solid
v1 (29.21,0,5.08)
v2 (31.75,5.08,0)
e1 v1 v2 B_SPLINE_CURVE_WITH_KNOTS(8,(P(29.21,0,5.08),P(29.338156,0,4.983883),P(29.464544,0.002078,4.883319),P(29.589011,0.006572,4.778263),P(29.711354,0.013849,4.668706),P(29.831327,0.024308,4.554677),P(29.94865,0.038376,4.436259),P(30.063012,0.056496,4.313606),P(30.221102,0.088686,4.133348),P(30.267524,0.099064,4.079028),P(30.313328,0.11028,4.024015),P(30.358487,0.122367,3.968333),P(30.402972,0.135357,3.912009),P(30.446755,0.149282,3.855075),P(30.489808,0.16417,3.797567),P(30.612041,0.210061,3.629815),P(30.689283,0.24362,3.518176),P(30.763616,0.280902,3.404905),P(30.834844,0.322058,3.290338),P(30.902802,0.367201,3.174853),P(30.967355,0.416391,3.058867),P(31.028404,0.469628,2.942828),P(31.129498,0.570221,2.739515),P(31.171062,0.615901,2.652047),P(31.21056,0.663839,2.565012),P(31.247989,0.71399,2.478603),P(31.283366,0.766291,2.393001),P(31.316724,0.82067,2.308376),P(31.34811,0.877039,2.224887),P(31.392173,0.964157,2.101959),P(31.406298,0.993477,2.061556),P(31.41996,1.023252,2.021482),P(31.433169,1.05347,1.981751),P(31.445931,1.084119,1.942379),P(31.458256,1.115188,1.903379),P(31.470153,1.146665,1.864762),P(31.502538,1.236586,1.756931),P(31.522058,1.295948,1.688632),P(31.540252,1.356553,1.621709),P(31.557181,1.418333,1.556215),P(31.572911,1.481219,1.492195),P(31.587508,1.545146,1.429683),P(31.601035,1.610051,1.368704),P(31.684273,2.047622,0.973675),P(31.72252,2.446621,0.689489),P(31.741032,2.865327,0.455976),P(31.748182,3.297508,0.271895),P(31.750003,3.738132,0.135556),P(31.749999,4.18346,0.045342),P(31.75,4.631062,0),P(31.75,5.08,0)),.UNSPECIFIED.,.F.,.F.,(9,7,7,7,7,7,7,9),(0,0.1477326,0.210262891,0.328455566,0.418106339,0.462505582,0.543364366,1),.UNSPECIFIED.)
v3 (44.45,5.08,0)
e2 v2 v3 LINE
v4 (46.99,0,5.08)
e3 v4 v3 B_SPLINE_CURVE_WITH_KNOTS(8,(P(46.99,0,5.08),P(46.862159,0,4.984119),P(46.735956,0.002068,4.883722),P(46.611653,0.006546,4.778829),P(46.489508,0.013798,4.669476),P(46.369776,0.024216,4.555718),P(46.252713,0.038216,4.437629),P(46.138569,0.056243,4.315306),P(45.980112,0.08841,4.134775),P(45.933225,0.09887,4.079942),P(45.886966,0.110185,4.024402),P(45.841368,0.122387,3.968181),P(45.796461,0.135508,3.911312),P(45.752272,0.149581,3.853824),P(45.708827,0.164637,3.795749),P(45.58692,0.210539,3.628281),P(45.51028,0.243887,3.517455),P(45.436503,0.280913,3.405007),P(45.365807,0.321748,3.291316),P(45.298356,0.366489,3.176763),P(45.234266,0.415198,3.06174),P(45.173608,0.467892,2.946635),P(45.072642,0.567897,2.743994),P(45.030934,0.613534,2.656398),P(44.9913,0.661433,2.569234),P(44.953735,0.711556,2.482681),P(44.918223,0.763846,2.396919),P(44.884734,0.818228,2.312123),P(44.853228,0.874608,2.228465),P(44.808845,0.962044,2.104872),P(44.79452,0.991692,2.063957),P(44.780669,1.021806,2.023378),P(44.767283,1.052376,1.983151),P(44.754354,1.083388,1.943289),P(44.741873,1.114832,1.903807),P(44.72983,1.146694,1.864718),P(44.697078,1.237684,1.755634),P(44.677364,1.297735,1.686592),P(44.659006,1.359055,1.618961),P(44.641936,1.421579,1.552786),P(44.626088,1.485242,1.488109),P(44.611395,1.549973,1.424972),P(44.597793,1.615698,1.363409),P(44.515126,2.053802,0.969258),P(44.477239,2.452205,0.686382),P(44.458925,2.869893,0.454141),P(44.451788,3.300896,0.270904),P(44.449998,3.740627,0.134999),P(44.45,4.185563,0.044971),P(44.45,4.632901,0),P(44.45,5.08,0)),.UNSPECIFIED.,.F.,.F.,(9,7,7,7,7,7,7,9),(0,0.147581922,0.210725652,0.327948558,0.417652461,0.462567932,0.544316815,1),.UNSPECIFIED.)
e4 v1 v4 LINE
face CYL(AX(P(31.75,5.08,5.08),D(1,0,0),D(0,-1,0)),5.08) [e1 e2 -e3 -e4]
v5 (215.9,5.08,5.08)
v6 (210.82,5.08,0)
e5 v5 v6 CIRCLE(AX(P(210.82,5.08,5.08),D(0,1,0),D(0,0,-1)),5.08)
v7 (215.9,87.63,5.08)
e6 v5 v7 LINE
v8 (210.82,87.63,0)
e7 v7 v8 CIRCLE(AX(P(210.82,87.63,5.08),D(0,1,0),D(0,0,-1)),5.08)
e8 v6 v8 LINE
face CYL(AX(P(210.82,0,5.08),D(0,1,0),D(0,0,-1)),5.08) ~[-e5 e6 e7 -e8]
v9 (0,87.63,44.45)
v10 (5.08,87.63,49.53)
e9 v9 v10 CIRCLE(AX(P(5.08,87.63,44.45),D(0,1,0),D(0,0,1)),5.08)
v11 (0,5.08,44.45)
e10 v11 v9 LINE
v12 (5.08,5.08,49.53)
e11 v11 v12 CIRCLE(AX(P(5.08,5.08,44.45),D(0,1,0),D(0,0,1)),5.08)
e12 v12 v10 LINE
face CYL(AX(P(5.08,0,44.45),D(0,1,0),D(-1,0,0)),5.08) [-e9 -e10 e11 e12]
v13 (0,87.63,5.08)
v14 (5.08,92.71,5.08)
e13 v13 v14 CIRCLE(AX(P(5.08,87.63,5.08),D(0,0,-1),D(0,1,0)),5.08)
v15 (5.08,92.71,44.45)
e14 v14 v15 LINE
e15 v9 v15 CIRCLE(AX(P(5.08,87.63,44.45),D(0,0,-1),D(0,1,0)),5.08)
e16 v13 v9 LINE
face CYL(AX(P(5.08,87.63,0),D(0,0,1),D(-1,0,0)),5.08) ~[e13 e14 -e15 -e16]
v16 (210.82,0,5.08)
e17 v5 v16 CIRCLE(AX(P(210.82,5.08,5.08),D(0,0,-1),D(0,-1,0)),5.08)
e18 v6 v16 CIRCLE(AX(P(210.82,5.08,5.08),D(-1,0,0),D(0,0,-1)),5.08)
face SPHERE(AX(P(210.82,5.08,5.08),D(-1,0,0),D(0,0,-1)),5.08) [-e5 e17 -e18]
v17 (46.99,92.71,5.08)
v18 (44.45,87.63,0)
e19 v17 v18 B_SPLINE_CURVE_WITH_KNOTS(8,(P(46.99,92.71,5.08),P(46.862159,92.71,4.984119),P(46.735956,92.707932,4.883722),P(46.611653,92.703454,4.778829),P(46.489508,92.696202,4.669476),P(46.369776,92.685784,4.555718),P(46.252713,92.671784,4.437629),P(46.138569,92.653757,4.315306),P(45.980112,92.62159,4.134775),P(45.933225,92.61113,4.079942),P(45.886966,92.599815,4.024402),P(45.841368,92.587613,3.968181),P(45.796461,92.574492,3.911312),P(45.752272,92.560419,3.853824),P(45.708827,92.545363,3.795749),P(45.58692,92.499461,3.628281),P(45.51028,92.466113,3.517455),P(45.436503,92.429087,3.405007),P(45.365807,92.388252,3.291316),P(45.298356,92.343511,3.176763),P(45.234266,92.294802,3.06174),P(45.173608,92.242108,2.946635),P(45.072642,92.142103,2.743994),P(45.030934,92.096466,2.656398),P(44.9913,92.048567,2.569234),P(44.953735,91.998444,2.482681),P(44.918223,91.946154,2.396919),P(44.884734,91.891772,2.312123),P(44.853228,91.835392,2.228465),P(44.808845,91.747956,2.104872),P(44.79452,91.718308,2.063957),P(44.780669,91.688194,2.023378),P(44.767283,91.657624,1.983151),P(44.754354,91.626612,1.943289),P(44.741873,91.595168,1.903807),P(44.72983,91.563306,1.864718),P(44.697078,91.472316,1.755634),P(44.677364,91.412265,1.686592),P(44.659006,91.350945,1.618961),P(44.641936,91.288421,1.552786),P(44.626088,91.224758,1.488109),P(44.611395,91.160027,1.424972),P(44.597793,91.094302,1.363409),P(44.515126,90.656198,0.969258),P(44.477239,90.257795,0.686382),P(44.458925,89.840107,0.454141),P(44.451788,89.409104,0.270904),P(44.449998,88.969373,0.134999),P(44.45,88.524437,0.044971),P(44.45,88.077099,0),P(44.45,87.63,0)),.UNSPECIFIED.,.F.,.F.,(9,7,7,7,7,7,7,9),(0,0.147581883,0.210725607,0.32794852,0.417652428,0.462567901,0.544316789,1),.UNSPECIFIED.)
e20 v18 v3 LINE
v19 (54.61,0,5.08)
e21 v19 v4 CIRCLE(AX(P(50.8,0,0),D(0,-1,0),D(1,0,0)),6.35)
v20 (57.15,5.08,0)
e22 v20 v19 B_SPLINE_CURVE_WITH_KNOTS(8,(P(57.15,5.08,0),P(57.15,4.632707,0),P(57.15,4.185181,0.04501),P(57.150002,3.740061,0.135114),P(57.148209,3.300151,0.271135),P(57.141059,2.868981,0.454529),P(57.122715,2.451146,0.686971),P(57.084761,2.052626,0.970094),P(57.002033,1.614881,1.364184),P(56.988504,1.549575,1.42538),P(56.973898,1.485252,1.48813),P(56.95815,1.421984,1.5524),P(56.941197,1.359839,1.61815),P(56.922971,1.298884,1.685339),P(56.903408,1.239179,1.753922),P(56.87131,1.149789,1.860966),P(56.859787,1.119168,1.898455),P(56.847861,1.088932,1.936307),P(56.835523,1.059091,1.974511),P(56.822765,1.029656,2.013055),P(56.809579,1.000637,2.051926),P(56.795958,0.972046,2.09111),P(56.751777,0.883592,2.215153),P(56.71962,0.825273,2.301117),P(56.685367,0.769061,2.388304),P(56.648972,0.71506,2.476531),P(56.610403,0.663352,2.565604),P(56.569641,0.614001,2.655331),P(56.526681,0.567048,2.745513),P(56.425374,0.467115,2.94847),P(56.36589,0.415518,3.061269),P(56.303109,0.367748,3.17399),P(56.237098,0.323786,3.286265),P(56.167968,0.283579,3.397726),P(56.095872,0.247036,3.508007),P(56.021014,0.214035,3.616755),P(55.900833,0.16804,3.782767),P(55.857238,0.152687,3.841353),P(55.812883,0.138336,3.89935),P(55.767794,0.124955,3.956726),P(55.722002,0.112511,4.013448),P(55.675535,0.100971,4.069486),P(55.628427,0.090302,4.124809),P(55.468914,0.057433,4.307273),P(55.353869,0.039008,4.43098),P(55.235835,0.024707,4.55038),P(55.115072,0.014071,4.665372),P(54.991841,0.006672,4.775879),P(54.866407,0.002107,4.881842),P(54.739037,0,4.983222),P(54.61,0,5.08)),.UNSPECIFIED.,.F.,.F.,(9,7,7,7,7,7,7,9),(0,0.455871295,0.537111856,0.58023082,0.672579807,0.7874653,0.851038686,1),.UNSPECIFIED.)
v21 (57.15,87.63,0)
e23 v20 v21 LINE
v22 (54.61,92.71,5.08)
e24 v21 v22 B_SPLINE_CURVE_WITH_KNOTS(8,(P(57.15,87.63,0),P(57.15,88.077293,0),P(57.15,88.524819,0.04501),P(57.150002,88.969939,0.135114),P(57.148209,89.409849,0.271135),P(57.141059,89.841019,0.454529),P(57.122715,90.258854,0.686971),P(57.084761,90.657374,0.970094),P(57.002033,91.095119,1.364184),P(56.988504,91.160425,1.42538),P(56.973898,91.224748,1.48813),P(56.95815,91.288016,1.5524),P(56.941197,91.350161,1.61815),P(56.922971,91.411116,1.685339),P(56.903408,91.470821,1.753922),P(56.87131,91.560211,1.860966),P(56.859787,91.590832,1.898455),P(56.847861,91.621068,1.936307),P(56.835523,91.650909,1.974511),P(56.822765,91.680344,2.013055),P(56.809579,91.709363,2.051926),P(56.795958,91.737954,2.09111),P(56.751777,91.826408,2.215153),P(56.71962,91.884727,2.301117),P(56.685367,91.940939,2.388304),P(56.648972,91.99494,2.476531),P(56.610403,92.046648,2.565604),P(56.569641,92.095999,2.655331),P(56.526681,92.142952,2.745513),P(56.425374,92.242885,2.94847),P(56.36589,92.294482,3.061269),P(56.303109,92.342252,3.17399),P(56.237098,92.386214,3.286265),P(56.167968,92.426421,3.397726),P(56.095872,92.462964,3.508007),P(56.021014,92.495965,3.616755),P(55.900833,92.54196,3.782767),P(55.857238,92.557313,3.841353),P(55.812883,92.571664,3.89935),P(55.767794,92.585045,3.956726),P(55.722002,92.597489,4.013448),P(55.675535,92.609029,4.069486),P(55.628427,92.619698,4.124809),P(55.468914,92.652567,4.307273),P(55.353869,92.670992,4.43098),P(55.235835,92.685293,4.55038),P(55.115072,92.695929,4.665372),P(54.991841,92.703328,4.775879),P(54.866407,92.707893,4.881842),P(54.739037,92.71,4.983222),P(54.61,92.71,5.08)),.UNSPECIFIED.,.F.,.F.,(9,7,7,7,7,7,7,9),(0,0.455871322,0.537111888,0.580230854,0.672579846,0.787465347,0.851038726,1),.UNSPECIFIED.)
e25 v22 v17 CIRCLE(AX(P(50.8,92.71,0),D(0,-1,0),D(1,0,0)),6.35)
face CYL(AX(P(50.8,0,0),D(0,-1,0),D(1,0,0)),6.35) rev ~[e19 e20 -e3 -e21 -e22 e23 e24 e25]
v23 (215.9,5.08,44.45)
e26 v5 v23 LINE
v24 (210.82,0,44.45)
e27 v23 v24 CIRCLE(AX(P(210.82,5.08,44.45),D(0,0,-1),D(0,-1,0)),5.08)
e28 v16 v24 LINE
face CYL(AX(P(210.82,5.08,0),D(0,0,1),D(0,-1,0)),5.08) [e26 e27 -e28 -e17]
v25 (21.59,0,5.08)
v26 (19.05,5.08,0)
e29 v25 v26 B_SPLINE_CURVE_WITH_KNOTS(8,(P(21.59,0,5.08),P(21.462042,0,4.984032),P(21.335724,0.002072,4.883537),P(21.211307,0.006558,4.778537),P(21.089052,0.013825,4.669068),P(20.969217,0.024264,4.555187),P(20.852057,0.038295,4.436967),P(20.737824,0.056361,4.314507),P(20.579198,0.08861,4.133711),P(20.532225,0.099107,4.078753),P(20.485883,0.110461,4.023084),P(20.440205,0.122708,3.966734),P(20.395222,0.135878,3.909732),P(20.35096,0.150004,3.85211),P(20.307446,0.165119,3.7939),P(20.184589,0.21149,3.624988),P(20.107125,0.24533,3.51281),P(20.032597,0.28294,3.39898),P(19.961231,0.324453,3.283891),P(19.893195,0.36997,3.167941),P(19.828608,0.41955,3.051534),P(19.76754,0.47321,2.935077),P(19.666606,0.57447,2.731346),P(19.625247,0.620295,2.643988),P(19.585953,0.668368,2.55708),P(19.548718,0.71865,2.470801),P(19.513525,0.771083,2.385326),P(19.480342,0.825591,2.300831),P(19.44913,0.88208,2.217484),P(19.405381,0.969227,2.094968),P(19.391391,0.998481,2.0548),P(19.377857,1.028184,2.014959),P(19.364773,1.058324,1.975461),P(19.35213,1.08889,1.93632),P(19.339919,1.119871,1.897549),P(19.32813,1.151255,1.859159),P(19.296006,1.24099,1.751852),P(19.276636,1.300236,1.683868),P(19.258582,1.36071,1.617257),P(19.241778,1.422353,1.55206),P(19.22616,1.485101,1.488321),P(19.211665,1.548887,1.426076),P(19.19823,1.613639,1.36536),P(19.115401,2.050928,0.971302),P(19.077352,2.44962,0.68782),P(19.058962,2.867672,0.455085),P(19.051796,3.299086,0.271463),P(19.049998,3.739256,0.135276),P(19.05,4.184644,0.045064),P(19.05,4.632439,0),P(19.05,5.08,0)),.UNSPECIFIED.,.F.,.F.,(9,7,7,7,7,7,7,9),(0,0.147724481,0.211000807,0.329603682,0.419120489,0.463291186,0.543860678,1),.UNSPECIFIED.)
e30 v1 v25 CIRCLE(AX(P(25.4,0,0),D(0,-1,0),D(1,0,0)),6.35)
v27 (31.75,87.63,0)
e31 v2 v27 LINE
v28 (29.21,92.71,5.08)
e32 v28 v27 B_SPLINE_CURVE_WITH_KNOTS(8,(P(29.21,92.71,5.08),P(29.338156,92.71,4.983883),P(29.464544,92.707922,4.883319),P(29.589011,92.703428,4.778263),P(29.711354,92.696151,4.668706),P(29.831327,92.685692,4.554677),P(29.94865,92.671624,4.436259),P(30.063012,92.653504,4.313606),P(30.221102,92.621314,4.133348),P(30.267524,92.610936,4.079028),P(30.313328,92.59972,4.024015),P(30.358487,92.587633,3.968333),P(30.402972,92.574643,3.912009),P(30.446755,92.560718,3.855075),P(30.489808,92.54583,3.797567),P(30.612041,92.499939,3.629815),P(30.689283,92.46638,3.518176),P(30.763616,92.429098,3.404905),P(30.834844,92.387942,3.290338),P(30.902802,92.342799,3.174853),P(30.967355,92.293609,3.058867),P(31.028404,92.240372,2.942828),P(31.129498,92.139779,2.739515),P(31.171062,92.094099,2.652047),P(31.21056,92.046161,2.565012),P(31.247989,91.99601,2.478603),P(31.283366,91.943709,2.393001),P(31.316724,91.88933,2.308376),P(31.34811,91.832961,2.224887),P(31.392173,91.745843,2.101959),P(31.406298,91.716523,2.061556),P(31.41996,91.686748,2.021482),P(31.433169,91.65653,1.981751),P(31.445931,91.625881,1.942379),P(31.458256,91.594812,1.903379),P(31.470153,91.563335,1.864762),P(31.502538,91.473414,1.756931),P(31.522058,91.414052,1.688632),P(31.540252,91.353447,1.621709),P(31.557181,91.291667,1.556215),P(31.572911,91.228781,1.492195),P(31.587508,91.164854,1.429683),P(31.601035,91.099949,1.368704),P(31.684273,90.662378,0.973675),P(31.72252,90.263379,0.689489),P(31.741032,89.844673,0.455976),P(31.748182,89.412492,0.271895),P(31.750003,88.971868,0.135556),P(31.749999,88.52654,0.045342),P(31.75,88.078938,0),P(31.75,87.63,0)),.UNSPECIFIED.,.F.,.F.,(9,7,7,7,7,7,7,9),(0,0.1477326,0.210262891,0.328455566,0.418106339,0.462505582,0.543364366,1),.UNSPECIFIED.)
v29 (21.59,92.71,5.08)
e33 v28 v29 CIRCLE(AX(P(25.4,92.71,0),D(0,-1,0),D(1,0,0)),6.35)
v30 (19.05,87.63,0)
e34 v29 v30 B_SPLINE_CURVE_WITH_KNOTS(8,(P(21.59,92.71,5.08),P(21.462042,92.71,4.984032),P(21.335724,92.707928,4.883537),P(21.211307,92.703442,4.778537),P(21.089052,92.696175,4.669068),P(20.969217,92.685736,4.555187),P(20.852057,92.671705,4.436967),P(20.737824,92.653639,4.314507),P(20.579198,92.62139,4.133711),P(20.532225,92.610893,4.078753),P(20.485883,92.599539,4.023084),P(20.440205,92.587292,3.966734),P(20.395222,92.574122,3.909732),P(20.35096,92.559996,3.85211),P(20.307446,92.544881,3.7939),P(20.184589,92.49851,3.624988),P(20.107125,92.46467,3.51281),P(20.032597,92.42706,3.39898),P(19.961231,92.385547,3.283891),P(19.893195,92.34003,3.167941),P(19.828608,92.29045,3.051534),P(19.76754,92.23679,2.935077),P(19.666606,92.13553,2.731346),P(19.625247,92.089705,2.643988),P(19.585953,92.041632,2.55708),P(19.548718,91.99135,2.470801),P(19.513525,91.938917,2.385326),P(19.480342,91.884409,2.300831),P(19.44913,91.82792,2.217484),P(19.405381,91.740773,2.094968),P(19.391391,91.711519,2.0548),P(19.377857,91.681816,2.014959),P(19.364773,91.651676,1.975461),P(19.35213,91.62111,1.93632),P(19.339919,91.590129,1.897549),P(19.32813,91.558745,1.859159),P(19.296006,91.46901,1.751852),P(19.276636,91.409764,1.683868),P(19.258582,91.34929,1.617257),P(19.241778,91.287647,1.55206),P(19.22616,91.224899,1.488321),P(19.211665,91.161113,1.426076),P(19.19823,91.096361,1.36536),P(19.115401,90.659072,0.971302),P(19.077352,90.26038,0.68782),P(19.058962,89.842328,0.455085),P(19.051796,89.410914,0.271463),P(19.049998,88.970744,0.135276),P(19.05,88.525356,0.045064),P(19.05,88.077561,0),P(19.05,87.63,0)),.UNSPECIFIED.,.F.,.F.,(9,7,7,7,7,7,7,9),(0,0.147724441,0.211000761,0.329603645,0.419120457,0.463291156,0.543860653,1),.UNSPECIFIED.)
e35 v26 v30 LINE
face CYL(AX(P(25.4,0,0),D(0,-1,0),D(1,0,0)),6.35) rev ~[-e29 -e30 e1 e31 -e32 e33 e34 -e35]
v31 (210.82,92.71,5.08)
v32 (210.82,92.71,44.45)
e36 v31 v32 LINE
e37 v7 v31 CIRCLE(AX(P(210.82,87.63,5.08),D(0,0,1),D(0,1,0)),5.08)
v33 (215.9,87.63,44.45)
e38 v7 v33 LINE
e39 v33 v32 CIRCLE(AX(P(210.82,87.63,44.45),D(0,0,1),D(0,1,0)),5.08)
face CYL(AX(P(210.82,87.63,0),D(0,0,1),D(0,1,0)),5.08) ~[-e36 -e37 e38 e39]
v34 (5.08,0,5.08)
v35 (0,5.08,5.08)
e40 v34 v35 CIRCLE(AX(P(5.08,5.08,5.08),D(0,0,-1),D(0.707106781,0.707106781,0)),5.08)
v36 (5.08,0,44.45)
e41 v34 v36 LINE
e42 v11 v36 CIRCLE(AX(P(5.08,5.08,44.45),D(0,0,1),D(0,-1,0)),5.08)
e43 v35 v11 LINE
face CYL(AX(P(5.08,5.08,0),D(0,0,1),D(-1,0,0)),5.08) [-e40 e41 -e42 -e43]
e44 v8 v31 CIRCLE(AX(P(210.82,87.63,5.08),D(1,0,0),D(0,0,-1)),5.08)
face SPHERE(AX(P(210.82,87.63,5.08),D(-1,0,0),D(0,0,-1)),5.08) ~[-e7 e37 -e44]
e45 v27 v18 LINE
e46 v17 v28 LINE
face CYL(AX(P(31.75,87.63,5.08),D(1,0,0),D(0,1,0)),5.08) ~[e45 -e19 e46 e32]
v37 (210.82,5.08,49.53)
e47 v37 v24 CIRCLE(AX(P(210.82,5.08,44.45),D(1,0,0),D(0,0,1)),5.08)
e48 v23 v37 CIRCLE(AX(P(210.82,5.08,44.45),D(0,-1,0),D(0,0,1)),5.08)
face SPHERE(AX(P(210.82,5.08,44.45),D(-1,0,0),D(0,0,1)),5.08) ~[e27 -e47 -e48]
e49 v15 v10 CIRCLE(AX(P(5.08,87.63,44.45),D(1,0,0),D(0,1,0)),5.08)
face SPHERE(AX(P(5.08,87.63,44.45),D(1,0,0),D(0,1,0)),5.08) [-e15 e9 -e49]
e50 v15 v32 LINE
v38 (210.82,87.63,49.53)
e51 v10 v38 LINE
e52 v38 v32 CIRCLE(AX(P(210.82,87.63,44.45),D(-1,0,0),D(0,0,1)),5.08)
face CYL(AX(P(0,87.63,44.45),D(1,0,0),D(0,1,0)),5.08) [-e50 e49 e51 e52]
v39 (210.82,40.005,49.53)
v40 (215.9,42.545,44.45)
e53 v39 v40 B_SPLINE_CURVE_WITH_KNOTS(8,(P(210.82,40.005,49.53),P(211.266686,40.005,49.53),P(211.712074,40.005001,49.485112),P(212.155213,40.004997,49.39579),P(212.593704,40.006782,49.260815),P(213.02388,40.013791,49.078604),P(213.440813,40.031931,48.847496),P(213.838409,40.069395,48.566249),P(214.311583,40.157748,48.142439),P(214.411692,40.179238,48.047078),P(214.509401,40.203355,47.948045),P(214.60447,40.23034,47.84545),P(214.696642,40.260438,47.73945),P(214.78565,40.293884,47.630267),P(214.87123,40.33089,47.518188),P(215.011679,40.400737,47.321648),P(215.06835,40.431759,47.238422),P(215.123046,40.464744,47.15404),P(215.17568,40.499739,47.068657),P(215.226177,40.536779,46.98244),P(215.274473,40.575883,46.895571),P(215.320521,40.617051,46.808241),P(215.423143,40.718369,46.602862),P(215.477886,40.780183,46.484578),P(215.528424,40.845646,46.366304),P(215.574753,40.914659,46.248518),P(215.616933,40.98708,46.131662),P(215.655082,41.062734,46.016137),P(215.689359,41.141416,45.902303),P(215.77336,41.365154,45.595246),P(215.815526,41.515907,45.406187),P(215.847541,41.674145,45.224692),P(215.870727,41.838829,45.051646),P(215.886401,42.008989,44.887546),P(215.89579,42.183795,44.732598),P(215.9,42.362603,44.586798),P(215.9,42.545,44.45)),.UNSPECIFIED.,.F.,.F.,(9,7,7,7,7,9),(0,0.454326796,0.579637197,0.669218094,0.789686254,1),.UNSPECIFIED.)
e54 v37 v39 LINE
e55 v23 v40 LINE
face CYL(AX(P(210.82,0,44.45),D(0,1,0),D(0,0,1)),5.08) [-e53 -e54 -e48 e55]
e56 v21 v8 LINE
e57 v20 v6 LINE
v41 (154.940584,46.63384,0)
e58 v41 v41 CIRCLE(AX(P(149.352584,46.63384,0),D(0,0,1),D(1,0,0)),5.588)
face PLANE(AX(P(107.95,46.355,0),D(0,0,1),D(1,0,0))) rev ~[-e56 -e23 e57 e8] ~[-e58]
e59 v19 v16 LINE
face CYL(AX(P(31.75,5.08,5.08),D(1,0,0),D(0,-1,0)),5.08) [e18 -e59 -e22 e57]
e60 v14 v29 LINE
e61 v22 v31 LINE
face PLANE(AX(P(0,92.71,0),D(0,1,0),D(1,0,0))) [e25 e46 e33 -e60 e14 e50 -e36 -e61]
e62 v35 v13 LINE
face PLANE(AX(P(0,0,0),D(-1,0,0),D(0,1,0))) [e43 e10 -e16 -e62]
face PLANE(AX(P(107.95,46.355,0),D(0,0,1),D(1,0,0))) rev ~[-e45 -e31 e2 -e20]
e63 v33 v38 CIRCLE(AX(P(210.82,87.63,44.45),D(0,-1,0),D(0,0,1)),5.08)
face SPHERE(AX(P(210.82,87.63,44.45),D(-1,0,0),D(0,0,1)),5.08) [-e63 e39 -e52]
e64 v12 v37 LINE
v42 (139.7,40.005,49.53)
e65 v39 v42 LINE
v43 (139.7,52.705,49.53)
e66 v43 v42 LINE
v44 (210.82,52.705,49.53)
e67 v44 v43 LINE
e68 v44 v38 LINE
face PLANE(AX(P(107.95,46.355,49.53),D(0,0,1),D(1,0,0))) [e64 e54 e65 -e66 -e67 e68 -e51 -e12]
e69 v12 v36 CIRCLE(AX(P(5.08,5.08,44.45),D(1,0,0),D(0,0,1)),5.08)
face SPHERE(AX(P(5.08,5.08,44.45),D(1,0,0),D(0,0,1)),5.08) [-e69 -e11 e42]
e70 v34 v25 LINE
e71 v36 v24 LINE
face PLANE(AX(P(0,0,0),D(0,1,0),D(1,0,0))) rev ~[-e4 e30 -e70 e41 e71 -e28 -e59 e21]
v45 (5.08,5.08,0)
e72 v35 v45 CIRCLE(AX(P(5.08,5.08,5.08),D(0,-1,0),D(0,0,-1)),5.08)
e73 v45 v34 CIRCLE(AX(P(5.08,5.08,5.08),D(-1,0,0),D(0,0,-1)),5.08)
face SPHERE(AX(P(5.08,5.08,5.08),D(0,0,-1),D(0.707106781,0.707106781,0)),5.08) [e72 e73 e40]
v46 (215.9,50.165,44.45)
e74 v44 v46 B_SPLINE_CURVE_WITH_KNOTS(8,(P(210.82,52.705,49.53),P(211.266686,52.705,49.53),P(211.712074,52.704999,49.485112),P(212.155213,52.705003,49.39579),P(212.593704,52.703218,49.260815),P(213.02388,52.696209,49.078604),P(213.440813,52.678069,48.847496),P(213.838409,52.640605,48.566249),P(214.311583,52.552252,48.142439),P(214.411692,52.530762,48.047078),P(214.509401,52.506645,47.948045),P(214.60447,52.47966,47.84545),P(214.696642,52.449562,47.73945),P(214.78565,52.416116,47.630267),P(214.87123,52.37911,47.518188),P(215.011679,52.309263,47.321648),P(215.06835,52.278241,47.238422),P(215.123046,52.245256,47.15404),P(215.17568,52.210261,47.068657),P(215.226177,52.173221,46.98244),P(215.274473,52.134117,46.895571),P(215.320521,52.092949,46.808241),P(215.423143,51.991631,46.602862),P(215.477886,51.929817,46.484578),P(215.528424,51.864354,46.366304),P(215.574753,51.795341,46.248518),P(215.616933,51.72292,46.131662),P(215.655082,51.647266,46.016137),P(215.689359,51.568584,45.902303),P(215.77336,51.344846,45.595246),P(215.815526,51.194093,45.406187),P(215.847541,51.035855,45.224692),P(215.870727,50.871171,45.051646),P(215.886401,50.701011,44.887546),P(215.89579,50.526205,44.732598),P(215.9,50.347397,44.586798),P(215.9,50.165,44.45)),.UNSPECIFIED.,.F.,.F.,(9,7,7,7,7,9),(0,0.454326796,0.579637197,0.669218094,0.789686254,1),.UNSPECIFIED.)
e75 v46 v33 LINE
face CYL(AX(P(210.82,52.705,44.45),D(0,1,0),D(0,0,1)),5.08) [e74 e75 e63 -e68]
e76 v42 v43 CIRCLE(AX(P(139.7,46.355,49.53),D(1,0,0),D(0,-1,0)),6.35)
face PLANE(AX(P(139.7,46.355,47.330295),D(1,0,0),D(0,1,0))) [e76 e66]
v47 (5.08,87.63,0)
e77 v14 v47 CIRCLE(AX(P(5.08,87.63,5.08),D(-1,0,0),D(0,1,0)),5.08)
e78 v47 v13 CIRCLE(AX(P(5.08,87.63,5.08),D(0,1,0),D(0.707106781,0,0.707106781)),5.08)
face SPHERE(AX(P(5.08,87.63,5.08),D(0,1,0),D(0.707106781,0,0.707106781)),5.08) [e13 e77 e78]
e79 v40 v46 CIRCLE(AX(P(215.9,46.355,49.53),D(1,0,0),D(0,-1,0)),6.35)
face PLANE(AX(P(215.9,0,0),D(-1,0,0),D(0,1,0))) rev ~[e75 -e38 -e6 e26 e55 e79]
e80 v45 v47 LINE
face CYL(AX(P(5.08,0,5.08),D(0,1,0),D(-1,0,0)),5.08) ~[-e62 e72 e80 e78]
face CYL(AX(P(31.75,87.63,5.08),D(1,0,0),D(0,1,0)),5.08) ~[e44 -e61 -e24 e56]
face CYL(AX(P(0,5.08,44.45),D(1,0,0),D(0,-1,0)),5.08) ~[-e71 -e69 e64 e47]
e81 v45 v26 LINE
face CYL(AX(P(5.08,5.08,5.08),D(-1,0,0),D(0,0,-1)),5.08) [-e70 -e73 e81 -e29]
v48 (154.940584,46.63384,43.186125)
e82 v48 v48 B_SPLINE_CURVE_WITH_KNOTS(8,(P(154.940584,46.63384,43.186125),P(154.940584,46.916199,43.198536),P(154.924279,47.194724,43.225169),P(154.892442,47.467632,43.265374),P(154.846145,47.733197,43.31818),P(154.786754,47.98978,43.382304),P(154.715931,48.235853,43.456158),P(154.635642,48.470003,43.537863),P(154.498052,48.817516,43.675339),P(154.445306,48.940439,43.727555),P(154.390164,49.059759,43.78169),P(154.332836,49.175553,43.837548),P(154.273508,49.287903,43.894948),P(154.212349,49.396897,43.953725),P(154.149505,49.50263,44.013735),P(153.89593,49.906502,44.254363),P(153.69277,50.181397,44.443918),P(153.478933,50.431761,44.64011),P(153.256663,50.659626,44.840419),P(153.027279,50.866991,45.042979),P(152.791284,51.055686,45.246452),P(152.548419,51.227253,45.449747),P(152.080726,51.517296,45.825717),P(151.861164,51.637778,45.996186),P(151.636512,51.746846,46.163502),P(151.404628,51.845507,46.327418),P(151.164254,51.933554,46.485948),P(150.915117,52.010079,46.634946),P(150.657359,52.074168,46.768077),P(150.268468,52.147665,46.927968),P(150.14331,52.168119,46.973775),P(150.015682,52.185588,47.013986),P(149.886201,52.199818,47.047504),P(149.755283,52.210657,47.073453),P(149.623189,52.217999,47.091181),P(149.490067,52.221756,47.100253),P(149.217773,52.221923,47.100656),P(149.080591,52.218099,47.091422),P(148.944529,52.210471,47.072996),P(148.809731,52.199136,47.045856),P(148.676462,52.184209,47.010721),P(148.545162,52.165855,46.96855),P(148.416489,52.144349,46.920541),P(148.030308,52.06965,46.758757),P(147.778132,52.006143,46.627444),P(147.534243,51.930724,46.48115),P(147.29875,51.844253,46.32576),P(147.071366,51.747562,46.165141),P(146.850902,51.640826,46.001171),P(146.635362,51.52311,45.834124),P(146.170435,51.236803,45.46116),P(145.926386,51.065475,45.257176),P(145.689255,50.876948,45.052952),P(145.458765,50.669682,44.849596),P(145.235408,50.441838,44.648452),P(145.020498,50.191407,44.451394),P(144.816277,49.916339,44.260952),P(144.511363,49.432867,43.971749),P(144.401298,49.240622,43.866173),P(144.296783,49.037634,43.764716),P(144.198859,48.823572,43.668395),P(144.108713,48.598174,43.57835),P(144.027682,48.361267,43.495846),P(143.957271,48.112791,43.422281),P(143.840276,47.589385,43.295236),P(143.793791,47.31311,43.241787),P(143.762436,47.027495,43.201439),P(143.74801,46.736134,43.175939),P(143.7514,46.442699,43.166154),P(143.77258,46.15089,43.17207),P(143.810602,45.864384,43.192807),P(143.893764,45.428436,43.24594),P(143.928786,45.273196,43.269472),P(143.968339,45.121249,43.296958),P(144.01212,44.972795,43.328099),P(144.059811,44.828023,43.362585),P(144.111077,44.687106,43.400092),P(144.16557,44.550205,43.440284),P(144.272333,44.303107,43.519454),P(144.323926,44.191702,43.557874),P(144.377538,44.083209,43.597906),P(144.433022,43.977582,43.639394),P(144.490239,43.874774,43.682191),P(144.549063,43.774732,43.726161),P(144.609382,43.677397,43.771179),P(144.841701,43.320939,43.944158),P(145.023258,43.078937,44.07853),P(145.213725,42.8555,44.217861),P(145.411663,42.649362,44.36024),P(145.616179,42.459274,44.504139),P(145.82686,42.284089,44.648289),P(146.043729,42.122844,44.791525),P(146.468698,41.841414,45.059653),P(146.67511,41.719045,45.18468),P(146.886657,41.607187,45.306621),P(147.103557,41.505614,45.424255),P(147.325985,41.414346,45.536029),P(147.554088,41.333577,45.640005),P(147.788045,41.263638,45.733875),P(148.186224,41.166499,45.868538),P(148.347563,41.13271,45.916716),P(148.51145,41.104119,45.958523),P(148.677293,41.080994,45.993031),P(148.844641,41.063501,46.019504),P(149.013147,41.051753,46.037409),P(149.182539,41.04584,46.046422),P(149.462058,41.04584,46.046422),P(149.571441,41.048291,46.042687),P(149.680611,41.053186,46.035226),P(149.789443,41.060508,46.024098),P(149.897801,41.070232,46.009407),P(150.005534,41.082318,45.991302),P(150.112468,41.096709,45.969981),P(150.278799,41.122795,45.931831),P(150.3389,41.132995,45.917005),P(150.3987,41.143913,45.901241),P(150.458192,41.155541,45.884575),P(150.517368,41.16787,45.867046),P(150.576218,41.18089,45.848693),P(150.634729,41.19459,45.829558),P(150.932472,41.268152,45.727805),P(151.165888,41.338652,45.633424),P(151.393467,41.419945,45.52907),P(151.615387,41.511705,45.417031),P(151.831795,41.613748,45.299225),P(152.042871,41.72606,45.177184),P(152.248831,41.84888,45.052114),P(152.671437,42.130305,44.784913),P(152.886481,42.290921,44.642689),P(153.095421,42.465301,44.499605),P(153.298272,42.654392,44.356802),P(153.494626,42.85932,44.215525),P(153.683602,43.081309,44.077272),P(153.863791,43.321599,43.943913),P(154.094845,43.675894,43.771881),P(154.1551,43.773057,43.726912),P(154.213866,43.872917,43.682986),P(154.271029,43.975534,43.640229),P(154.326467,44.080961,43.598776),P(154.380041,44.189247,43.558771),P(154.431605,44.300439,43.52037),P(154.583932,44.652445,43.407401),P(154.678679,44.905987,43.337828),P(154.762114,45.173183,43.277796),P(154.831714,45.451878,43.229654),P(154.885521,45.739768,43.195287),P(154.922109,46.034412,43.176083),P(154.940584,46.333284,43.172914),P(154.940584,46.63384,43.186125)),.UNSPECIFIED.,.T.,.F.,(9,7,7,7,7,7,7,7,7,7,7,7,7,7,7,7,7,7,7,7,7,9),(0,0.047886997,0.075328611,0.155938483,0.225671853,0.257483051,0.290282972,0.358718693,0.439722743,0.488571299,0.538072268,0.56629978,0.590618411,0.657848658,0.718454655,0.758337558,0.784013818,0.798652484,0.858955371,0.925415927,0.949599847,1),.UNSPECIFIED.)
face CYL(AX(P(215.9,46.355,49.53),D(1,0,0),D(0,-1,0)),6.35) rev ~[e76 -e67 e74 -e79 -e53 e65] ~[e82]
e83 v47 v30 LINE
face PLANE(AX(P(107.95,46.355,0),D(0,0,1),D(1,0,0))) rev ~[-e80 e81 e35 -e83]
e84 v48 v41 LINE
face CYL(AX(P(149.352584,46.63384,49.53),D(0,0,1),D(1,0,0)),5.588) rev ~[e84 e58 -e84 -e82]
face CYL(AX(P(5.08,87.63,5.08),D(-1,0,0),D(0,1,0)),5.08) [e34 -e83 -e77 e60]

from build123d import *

# Parameters (mm, degrees)
F0_W         = 215.9
F0_H         = 92.71
F1_DEPTH     = 49.53
F3_DEPTH     = 76.2
F5_DEPTH     = 92.71
F6_R         = 5.08
F7_R         = 6.35
F8_DEPTH     = 92.7110001
F9_T1_DEPTH  = 26.67
F9_S5_W      = 5.08
F9_S5_H      = 5.08
F9_T6_DEPTH  = 5.08
F9_S11_W     = 5.08
F9_S11_H     = 5.08
F9_T12_DEPTH = 5.08
F10_R        = 5.588
F11_DEPTH    = 49.5310001


# Not quite as in the source:
# - a fillet or chamfer that OpenCascade refuses, or shapes differently, is made with other operations: its cross-section is extruded or revolved along the edge and cut away or added


with BuildPart() as f1:
    # F0 (on Top) → F1 (new body)
    with BuildSketch(Plane.XY):
        with Locations((107.95, 46.355)):
            Rectangle(F0_W, F0_H)
    extrude(amount=F1_DEPTH)

    # F2 (on face) → F3 (cut)
    with BuildSketch(Plane.YZ.offset(215.9)):
        with BuildLine():
            Line((52.705, 49.53), (40.005, 49.53))
            ThreePointArc((40.005, 49.53), (46.355, 43.18), (52.705, 49.53))
        make_face()
    extrude(amount=-F3_DEPTH, mode=Mode.SUBTRACT)

    # F4 (on face) → F5 (cut, through all)
    with BuildSketch(Plane.XZ):
        with BuildLine():
            Line((19.05, 0), (31.75, 0))
            ThreePointArc((31.75, 0), (25.4, 6.35), (19.05, 0))
        make_face()
    extrude(amount=-F5_DEPTH, mode=Mode.SUBTRACT)

    # F6
    f6_edges = [f1.edges().sort_by_distance(p)[0] for p in [
        (107.95, 0, 49.53),
        (215.9, 20.0025, 49.53),
        (107.95, 92.71, 49.53),
        (215.9, 72.7075, 49.53),
        (0, 92.71, 24.765),
        (0, 46.355, 49.53),
        (0, 0, 24.765),
        (0, 46.355, 0),
        (123.825, 0, 0),
        (123.825, 92.71, 0),
        (215.9, 46.355, 0),
        (215.9, 92.71, 24.765),
        (215.9, 0, 24.765),
    ]]
    fillet(f6_edges, radius=F6_R)

    # F7 (on Front) → F8 (cut, through all)
    with BuildSketch(Plane.XZ):
        with Locations((50.8, 0)):
            Circle(F7_R)
    extrude(amount=-F8_DEPTH, mode=Mode.SUBTRACT)

    # F9: fillet of radius 5.08 on 2 edges, made by hand

    # F9_s2 → F9_t1 (cut)
    with BuildSketch(Plane.YZ.offset(5.08)):
        with BuildLine():
            ThreePointArc((5.08, 0), (1.4878975516, 1.4878975516), (0, 5.08))
            Line((0, 5.08), (0, 0))
            Line((0, 0), (5.08, 0))
        make_face()
        with BuildLine():
            ThreePointArc((92.71, 5.08), (91.2221024484, 1.4878975516), (87.63, 0))
            Line((87.63, 0), (92.71, 0))
            Line((92.71, 0), (92.71, 5.08))
        make_face()
    extrude(amount=F9_T1_DEPTH, mode=Mode.SUBTRACT)


with BuildPart() as f9_tool4:
    # F9_s5 → F9_t6 (new body)
    with BuildSketch(Plane.XZ.offset(-87.63)):
        with Locations((2.54, 2.54)):
            Rectangle(F9_S5_W, F9_S5_H)
    extrude(amount=-F9_T6_DEPTH)

    # F9_s7 → F9_t8 (revolve, cut)
    with BuildSketch(Plane(origin=(5.08, 87.63, 5.08), x_dir=(0.7071067812, 0, 0.7071067812), z_dir=(-0.7071067812, 0, 0.7071067812))):
        with BuildLine():
            ThreePointArc((0, -5.08), (5.08, 0), (0, 5.08))
            Line((0, 5.08), (0, -5.08))
        make_face()
    revolve(axis=Axis((5.08, 87.63, 5.08), (0, 1, 0)), mode=Mode.SUBTRACT)


with BuildPart() as f1_1:
    add(f1.part)

    # F9_t3: cut F9_tool4
    add(f9_tool4.part, mode=Mode.SUBTRACT)


with BuildPart() as f9_tool10:
    # F9_s11 → F9_t12 (new body)
    with BuildSketch(Plane.XY.offset(5.08)):
        with Locations((2.54, 2.54)):
            Rectangle(F9_S11_W, F9_S11_H)
    extrude(amount=-F9_T12_DEPTH)

    # F9_s13 → F9_t14 (revolve, cut)
    with BuildSketch(Plane(origin=(5.08, 5.08, 5.08), x_dir=(0.7071067812, 0.7071067812, 0), z_dir=(-0.7071067812, 0.7071067812, 0))):
        with BuildLine():
            ThreePointArc((0, -5.08), (5.08, 0), (0, 5.08))
            Line((0, 5.08), (0, -5.08))
        make_face()
    revolve(axis=Axis((5.08, 5.08, 5.08), (0, 0, -1)), mode=Mode.SUBTRACT)


with BuildPart() as f1_2:
    add(f1_1.part)

    # F9_t9: cut F9_tool10
    add(f9_tool10.part, mode=Mode.SUBTRACT)

    # F10 (on face) → F11 (cut, through all)
    with BuildSketch(Plane.XY.offset(49.53)):
        with Locations((149.3525841786, 46.6338395569)):
            Circle(F10_R)
    extrude(amount=-F11_DEPTH, mode=Mode.SUBTRACT)


solid = f1_2.part
